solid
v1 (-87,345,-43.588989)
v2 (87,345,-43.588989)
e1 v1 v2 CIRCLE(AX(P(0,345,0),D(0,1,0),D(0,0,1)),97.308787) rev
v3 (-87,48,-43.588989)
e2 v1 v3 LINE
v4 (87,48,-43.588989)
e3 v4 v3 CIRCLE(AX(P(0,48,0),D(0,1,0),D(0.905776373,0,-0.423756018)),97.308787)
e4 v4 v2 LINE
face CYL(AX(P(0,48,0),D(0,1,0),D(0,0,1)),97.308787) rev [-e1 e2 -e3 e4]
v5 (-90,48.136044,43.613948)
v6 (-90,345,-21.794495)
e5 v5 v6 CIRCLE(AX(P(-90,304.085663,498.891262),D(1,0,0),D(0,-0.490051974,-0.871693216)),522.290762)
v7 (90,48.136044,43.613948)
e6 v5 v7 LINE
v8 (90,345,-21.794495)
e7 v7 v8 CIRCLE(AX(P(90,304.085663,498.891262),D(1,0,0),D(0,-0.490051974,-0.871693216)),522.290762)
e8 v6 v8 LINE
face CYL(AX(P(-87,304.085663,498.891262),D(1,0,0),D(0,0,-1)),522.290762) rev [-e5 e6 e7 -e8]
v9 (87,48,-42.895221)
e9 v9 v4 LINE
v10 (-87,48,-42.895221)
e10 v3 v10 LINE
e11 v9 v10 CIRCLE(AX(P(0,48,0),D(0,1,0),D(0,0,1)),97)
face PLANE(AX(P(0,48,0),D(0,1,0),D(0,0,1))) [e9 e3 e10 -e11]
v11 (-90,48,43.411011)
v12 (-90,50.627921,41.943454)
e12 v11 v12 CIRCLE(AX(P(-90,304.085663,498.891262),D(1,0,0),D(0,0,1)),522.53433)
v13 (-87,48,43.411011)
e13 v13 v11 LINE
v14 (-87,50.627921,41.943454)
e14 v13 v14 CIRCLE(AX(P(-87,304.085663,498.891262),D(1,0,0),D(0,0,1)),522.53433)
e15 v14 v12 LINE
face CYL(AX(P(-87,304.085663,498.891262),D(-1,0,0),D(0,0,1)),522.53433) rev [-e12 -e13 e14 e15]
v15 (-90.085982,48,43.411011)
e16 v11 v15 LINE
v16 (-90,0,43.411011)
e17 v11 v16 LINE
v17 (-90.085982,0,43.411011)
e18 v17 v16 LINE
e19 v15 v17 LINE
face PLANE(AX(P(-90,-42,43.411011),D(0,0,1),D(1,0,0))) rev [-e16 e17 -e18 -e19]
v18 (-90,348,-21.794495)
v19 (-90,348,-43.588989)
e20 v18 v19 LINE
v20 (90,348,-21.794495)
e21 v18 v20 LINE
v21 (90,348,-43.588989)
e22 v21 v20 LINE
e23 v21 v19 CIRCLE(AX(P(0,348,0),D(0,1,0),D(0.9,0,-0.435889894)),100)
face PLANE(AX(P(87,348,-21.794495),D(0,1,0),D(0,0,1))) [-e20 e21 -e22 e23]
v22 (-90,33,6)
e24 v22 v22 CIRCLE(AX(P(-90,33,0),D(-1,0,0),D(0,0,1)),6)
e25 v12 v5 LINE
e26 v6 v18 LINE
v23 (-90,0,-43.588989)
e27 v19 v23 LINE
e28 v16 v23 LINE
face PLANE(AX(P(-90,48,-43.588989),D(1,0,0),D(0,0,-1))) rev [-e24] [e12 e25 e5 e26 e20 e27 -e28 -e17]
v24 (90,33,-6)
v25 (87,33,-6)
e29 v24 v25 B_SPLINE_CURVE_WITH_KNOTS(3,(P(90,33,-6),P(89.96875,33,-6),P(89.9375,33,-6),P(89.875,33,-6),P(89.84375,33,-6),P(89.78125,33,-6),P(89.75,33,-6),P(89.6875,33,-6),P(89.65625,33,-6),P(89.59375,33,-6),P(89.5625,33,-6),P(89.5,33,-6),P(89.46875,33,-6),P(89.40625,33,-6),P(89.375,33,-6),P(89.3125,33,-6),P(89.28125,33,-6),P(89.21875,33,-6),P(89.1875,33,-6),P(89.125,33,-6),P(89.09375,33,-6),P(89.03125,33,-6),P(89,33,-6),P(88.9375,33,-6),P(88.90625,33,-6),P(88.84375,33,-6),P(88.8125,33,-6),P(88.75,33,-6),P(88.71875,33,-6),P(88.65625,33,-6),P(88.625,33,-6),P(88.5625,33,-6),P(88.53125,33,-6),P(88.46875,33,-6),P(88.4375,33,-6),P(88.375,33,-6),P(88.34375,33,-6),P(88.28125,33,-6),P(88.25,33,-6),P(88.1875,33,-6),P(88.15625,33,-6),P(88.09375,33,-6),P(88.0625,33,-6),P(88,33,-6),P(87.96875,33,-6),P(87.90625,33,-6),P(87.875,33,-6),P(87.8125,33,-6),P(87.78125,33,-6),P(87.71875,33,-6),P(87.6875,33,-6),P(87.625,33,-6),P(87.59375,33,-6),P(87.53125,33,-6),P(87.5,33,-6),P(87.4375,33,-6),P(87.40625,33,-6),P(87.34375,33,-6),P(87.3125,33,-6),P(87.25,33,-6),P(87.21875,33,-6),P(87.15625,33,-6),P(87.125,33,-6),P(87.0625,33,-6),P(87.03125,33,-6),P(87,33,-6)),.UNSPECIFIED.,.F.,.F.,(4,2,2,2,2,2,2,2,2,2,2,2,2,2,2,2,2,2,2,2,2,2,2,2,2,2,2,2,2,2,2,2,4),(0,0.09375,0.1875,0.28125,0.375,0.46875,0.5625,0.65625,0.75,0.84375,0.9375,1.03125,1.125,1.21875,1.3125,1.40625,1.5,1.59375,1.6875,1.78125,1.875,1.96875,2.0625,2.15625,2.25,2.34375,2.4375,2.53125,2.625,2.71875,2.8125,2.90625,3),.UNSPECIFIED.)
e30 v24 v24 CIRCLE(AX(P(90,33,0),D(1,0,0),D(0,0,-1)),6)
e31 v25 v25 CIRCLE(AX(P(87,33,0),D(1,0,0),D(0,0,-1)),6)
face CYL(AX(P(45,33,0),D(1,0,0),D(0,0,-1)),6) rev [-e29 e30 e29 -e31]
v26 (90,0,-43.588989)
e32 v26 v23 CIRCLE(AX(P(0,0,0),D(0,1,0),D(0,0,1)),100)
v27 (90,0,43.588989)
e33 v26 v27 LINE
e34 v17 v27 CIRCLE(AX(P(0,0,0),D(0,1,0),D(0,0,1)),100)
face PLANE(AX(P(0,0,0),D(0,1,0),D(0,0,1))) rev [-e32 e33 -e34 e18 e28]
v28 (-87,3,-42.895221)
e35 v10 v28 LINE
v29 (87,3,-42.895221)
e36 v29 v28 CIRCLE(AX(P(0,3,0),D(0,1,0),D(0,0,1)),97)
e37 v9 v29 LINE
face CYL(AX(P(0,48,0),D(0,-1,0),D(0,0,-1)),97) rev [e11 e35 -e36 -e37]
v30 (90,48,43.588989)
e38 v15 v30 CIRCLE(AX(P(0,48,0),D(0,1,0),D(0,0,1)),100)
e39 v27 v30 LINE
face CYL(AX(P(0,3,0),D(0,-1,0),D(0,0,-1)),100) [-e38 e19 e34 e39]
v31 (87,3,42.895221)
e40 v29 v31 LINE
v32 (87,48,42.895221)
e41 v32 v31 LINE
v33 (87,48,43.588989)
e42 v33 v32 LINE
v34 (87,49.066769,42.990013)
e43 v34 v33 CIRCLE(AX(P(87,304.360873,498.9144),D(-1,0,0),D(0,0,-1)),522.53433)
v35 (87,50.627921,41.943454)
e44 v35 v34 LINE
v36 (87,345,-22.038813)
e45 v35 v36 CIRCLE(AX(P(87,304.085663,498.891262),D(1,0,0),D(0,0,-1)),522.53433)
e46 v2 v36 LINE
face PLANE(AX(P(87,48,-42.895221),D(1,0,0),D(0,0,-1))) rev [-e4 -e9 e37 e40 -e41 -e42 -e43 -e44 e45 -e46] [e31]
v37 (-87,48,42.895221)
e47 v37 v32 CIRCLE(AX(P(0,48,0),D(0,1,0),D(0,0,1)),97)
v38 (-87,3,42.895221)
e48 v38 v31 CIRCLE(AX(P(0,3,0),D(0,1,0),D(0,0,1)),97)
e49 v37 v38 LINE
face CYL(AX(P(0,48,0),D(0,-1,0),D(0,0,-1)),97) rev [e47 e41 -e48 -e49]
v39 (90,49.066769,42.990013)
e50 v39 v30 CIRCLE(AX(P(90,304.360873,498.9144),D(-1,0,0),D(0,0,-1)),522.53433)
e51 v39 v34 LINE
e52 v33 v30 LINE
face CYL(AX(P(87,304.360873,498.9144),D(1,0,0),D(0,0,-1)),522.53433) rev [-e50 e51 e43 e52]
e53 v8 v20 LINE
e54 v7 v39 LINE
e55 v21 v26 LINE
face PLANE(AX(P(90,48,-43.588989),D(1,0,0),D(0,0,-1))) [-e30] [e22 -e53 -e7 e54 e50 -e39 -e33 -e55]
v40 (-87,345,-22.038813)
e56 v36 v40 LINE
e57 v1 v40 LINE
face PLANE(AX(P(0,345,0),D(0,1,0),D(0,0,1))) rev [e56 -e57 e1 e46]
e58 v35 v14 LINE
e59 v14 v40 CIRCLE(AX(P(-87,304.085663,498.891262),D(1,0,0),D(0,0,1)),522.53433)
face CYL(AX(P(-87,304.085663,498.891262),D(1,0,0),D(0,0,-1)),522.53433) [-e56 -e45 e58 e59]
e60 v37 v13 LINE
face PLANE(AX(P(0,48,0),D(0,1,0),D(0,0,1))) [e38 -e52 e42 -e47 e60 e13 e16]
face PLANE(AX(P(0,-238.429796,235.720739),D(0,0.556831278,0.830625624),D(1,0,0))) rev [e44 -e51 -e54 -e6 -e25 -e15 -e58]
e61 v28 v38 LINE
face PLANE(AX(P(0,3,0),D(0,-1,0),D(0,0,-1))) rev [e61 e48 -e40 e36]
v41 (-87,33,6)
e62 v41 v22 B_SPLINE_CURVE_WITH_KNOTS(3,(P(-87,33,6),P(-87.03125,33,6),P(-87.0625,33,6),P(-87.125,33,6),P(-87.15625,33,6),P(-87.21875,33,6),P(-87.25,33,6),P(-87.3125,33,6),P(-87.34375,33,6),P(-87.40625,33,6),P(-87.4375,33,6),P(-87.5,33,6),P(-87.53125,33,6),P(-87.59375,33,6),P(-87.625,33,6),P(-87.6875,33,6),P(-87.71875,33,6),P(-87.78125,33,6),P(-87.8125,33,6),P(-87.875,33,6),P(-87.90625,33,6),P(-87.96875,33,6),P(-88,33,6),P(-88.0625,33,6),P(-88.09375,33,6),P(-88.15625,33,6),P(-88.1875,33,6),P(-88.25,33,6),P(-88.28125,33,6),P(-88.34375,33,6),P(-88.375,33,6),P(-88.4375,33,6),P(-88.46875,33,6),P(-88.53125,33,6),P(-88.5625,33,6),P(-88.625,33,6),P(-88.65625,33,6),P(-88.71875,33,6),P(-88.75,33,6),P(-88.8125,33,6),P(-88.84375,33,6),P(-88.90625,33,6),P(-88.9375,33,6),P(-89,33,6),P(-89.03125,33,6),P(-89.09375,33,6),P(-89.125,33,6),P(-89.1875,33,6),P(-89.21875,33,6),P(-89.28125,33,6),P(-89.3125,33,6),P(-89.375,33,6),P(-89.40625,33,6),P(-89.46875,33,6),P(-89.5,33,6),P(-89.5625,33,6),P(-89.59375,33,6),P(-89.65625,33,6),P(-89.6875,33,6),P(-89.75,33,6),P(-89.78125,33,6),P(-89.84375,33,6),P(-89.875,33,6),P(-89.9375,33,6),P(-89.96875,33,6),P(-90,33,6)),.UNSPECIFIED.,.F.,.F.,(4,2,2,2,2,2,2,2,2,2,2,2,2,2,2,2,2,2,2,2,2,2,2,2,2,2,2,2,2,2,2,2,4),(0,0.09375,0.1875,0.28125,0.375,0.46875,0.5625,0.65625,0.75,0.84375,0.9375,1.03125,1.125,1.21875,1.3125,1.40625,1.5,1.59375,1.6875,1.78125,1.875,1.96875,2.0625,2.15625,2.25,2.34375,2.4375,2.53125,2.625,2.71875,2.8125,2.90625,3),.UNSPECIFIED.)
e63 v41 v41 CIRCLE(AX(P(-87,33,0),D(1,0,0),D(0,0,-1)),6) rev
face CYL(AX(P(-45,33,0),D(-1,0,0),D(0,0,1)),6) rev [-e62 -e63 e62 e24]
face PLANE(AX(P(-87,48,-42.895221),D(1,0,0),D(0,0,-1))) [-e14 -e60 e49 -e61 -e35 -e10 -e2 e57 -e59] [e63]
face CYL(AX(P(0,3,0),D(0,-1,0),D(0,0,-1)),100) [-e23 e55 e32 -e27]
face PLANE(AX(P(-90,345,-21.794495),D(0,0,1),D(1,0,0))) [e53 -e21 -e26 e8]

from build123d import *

# Parameters (mm, degrees)
SKETCH1_R            = 100
BOSS_EXTRUDE2_DEPTH  = 3
SKETCH5_W            = 3
SKETCH5_H            = 87
BOSS_EXTRUDE5_DEPTH  = 45
SKETCH8_W            = 3
SKETCH8_H            = 87
BOSS_EXTRUDE6_DEPTH  = 45
SKETCH9_W            = 23.719660605
SKETCH9_H            = 94.301811056
CUT_EXTRUDE2_DEPTH   = 45
SKETCH10_W           = 23.969699351
SKETCH10_H           = 92.447375273
CUT_EXTRUDE3_DEPTH   = 45
SKETCH11_R           = 6
CUT_EXTRUDE4_DEPTH   = 45
CUT_EXTRUDE5_START   = -45
SKETCH12_R           = 6
CUT_EXTRUDE5_DEPTH   = 45
BOSS_EXTRUDE7_DEPTH  = 45
CUT_EXTRUDE6_DEPTH   = 45
BOSS_EXTRUDE8_DEPTH  = 3
BOSS_EXTRUDE10_DEPTH = 3
SWEEP1_START         = 48
SWEEP1_DEPTH         = 300
BOSS_EXTRUDE11_START = -3
BOSS_EXTRUDE11_DEPTH = 3
SWEEP2_START         = -90
SWEEP2_DEPTH         = 180


# Read off the part's stored shape, not the designer's step: Sweep1, Sweep2
with BuildPart() as part:
    # Sketch1 → Boss-Extrude2 (new body)
    with BuildSketch(Plane(origin=(0, 0, 0), x_dir=(1, 0, 0), z_dir=(0, 1, 0))):
        with Locations(Location((0, 0, 0), (0, 0, 270))):
            Circle(SKETCH1_R)
    extrude(amount=BOSS_EXTRUDE2_DEPTH)

    # Sketch5 → Boss-Extrude5 (add)
    with BuildSketch(Plane(origin=(0, 3, 0), x_dir=(1, 0, 0), z_dir=(0, 1, 0))):
        with Locations((88.5, 0.088989435)):
            Rectangle(SKETCH5_W, SKETCH5_H)
    extrude(amount=BOSS_EXTRUDE5_DEPTH)

    # Sketch8 → Boss-Extrude6 (add)
    with BuildSketch(Plane(origin=(0, 3, 0), x_dir=(1, 0, 0), z_dir=(0, 1, 0))):
        with Locations((-88.5, 0.088989435)):
            Rectangle(SKETCH8_W, SKETCH8_H)
    extrude(amount=BOSS_EXTRUDE6_DEPTH)

    # Sketch9 → Cut-Extrude2 (cut)
    with BuildSketch(Plane(origin=(0, 3, 0), x_dir=(1, 0, 0), z_dir=(0, 1, 0))):
        with Locations((101.859830303, -3.561916093)):
            Rectangle(SKETCH9_W, SKETCH9_H)
    extrude(amount=-CUT_EXTRUDE2_DEPTH, mode=Mode.SUBTRACT)

    # Sketch10 → Cut-Extrude3 (cut)
    with BuildSketch(Plane(origin=(0, 3, 0), x_dir=(1, 0, 0), z_dir=(0, 1, 0))):
        with Locations((-101.984849676, 2.812677071)):
            Rectangle(SKETCH10_W, SKETCH10_H)
    extrude(amount=-CUT_EXTRUDE3_DEPTH, mode=Mode.SUBTRACT)

    # Sketch11 → Cut-Extrude4 (cut)
    with BuildSketch(Plane.ZY.offset(90)):
        with Locations((0, 33)):
            Circle(SKETCH11_R)
    extrude(amount=-CUT_EXTRUDE4_DEPTH, mode=Mode.SUBTRACT)

    # Sketch12 → Cut-Extrude5 (cut)
    with BuildSketch(Plane(origin=(90, 0, 0), x_dir=(0, 0, -1), z_dir=(1, 0, 0)).offset(CUT_EXTRUDE5_START)):
        with Locations(Location((0, 33, 0), (0, 0, 180))):
            Circle(SKETCH12_R)
    extrude(amount=CUT_EXTRUDE5_DEPTH, mode=Mode.SUBTRACT)

    # Sketch14 → Boss-Extrude7 (add)
    with BuildSketch(Plane(origin=(0, 3, 0), x_dir=(1, 0, 0), z_dir=(0, 1, 0))):
        with BuildLine():
            Line((-90, -43.411010565), (-90.085982049, -43.411010565))
            ThreePointArc((-90.085982049, -43.411010565), (-0.098829893, -99.999951163), (90, -43.588989435))
            Line((90, -43.588989435), (90, -43.411010565))
            Line((90, -43.411010565), (87, -43.411010565))
            Line((87, -43.411010565), (87, 43.588989435))
            Line((87, 43.588989435), (90, 43.588989435))
            ThreePointArc((90, 43.588989435), (0, 100), (-90, 43.588989435))
            Line((-90, 43.588989435), (-87, 43.588989435))
            Line((-87, 43.588989435), (-87, -43.411010565))
            Line((-87, -43.411010565), (-90, -43.411010565))
        make_face()
    extrude(amount=BOSS_EXTRUDE7_DEPTH)

    # 3DSketch1 → Cut-Extrude6 (cut)
    with BuildSketch(Plane(origin=(-87, 48, -42.895221179), x_dir=(0.8969072164948455, 0, 0.4422187750417981), z_dir=(0, -1, 0))):
        with BuildLine():
            Line((0, 0), (37.93814433, 76.946066857))
            ThreePointArc((37.93814433, 76.946066857), (139.895221179, 87), (194, 0))
            Line((194, 0), (156.06185567, -76.946066857))
            ThreePointArc((156.06185567, -76.946066857), (54.104778821, -87), (0, 0))
        make_face()
    extrude(amount=CUT_EXTRUDE6_DEPTH, mode=Mode.SUBTRACT)

    # Sketch17 → Boss-Extrude8 (add)
    with BuildSketch(Plane(origin=(90, 0, 0), x_dir=(0, 0, -1), z_dir=(1, 0, 0))):
        with BuildLine():
            Line((21.794494718, 348), (43.588989435, 348))
            Line((43.588989435, 348), (43.588989435, 48))
            Line((43.588989435, 48), (-43.588989435, 48))
            ThreePointArc((-43.588989435, 48), (11.635050375, 193.089199561), (21.794494718, 348))
        make_face()
    extrude(amount=-BOSS_EXTRUDE8_DEPTH)

    # Sketch21 → Boss-Extrude10 (add)
    with BuildSketch(Plane.ZY.offset(90)):
        with BuildLine():
            Line((43.411010565, 48), (-43.588989435, 48))
            Line((-43.588989435, 48), (-43.588989435, 348))
            Line((-43.588989435, 348), (-21.794494718, 348))
            ThreePointArc((-21.794494718, 348), (-11.721133915, 193.103198738), (43.411010565, 48))
        make_face()
    extrude(amount=-BOSS_EXTRUDE10_DEPTH)

    # Sweep1 outline → Sweep1 (add)
    with BuildSketch(Plane(origin=(0, 0, 0), x_dir=(1, 0, 0), z_dir=(0, 1, 0)).offset(SWEEP1_START)):
        with BuildLine():
            ThreePointArc((90, 43.588989435), (0, 100), (-90, 43.588989435))
            Line((-90, 43.588989435), (-87, 43.588989435))
            ThreePointArc((-87, 43.588989435), (0, 97.308786859), (87, 43.588989435))
            Line((87, 43.588989435), (90, 43.588989435))
        make_face()
    extrude(amount=SWEEP1_DEPTH)

    # Sketch26 → Boss-Extrude11 (add)
    with BuildSketch(Plane(origin=(0, 348, 0), x_dir=(1, 0, 0), z_dir=(0, 1, 0)).offset(BOSS_EXTRUDE11_START)):
        with BuildLine():
            Line((-90, 21.794494718), (90, 21.794494718))
            Line((90, 21.794494718), (90, 43.588989435))
            ThreePointArc((90, 43.588989435), (0, 100), (-90, 43.588989435))
            Line((-90, 43.588989435), (-90, 21.794494718))
        make_face()
    extrude(amount=BOSS_EXTRUDE11_DEPTH)

    # Sweep2 outline → Sweep2 (add)
    with BuildSketch(Plane.YZ.offset(SWEEP2_START)):
        with BuildLine():
            ThreePointArc((50.627921058, 41.94345394), (193.103198738, -11.721133915), (345, -22.038813222))
            Line((345, -22.038813222), (345, -21.794494718))
            ThreePointArc((345, -21.794494718), (191.70412896, -11.165627984), (48.136044185, 43.613947774))
            Line((48.136044185, 43.613947774), (50.627921058, 41.94345394))
        make_face()
    extrude(amount=SWEEP2_DEPTH)


solid = part.part
